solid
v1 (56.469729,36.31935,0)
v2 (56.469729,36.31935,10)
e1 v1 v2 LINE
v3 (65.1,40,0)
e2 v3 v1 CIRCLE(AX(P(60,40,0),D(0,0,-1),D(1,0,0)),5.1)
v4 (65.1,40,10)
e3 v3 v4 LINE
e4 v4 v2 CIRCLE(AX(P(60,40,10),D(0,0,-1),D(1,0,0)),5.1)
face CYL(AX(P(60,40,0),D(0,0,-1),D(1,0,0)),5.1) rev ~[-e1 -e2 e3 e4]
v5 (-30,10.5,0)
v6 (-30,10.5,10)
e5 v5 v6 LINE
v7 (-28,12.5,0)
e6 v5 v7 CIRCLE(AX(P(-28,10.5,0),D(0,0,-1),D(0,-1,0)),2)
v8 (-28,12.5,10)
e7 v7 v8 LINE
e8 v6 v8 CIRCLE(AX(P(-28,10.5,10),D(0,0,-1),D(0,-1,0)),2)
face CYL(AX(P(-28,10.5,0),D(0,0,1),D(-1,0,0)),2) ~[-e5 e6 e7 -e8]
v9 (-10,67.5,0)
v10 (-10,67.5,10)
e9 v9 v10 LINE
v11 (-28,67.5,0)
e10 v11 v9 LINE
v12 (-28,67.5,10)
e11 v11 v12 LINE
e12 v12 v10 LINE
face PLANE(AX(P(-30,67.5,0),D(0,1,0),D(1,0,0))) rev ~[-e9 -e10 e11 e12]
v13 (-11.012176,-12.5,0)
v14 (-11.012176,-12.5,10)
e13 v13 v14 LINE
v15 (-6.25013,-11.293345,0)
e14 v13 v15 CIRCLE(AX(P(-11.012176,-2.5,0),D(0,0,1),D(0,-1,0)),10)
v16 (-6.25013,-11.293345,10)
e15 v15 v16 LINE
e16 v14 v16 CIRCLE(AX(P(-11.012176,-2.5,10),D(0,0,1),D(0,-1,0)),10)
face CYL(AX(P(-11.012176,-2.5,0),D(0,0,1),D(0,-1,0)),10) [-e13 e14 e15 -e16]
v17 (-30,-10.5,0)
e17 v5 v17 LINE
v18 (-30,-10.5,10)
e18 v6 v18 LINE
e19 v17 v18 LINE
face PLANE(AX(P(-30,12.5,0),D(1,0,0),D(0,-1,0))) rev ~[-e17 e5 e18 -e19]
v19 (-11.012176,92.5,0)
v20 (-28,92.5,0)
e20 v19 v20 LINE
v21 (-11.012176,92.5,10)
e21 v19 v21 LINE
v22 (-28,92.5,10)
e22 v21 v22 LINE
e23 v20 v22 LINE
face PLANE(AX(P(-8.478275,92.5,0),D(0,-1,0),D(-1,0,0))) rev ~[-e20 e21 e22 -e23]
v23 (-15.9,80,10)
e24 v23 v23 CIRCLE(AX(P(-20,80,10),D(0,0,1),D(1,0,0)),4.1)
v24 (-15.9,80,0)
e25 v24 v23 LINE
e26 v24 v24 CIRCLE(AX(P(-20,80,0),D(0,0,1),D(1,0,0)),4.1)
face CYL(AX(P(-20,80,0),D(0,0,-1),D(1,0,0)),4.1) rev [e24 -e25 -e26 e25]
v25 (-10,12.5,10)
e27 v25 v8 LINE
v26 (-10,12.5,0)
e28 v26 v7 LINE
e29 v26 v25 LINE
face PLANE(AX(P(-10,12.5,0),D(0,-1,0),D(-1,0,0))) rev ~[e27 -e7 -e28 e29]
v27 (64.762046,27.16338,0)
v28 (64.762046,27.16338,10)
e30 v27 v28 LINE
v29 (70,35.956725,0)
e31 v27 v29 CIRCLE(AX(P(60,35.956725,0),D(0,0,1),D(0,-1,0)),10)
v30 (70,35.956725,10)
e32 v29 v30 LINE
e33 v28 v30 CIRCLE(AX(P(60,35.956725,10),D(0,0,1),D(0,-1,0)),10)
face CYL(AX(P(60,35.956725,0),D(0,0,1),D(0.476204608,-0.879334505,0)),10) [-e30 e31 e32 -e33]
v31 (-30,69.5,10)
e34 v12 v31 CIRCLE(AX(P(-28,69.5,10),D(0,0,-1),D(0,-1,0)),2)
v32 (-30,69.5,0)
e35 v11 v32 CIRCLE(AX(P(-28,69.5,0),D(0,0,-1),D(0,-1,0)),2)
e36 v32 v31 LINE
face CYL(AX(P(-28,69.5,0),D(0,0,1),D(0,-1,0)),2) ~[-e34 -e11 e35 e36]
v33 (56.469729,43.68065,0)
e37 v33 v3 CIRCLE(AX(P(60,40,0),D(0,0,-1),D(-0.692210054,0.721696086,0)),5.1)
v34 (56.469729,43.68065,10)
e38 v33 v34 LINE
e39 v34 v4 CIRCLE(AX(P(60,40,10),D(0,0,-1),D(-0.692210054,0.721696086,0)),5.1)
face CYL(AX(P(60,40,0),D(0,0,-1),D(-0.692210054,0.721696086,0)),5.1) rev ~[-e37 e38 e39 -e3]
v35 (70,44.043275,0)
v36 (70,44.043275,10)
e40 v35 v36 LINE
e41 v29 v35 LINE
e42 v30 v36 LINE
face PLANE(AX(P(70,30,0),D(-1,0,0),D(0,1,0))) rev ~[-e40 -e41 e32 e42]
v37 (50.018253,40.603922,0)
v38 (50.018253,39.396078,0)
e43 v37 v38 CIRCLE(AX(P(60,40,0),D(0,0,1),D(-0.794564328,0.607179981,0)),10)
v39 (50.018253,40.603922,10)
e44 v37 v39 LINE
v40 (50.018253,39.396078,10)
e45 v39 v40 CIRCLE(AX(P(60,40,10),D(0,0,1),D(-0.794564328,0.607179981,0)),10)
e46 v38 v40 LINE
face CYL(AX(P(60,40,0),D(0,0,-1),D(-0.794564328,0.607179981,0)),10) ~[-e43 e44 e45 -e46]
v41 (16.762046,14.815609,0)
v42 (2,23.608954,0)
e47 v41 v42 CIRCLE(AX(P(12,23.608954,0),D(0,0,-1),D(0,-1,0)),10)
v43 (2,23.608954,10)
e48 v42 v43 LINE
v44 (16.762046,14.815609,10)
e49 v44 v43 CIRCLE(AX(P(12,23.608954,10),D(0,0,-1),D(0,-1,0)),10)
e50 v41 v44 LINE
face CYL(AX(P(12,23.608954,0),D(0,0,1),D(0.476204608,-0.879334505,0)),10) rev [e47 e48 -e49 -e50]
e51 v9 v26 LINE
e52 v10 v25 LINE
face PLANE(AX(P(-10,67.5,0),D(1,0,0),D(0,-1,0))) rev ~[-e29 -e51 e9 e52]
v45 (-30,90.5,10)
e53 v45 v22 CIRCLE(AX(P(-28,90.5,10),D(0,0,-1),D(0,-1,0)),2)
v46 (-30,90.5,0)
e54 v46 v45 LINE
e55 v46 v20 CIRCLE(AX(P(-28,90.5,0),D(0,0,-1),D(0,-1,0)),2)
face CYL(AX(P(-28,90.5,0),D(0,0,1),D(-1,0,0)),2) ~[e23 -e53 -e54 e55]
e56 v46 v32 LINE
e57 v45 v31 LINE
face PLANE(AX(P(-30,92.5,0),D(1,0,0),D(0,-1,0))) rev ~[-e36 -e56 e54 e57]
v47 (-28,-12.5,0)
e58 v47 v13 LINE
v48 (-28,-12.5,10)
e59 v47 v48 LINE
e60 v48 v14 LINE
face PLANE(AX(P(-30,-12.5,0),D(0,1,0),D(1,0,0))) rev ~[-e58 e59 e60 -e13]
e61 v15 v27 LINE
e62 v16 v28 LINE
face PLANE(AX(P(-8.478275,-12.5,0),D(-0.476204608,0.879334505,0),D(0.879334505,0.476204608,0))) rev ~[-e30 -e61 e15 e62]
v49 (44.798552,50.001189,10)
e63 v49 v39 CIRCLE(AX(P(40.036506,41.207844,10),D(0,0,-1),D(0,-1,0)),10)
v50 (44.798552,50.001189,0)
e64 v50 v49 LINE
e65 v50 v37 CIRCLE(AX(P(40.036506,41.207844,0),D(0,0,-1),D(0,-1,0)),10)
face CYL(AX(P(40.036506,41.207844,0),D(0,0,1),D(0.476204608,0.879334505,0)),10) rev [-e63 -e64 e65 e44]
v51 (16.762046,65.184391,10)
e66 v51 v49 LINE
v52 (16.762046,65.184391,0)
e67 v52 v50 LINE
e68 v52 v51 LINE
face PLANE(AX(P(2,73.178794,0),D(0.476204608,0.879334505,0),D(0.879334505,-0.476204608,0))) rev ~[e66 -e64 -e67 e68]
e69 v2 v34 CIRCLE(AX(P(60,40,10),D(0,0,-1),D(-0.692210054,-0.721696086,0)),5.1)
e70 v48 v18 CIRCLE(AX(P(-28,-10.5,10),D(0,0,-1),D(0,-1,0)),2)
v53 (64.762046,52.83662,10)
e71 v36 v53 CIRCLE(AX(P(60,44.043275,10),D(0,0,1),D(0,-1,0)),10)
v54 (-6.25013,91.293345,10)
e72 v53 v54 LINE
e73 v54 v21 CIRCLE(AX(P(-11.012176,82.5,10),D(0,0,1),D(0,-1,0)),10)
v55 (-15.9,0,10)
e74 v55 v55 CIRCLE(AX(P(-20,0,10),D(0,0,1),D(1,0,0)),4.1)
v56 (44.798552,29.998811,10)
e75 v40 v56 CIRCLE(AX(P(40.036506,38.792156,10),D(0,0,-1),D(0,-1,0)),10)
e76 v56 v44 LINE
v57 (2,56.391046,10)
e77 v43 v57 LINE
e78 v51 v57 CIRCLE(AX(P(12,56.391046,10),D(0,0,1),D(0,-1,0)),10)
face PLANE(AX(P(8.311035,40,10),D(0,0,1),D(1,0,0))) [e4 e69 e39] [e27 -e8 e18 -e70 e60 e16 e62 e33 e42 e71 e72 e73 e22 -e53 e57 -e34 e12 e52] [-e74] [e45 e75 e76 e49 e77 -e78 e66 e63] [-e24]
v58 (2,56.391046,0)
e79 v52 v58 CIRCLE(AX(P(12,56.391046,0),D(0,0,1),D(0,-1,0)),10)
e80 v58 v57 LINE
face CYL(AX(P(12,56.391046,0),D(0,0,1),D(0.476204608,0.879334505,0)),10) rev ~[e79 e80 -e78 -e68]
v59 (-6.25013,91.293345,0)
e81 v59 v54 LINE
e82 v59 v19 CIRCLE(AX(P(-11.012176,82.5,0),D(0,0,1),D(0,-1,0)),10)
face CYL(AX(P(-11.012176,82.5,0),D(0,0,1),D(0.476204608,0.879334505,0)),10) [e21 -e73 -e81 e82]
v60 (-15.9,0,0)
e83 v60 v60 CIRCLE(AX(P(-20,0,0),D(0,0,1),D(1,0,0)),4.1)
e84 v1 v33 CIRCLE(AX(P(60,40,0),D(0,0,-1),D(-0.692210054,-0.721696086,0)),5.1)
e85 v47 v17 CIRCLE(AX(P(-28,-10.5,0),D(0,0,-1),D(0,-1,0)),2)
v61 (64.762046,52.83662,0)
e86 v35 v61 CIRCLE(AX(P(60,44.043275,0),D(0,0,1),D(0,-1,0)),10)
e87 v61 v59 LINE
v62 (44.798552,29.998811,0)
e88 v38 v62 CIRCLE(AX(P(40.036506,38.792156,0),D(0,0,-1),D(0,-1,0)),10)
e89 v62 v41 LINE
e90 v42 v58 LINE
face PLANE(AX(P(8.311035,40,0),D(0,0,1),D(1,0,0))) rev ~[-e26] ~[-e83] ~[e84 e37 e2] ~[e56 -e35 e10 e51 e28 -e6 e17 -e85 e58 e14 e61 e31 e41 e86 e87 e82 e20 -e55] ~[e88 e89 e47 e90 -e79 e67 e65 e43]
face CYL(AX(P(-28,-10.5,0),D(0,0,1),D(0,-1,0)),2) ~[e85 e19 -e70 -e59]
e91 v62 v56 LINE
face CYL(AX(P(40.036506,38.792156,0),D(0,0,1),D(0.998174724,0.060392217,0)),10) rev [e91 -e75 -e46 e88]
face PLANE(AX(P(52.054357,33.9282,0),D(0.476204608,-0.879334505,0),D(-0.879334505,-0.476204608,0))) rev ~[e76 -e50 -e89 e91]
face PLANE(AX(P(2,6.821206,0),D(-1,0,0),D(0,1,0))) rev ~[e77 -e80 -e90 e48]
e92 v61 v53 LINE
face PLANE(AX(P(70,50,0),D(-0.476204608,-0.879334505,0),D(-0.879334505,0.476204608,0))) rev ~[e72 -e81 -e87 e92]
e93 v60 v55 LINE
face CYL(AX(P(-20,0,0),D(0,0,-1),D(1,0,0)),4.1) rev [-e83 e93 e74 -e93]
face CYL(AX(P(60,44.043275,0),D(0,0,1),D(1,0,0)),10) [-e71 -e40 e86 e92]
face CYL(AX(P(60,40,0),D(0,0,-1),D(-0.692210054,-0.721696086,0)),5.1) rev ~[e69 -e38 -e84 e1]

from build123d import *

# Parameters (mm, degrees)
F0_R     = 4.1
F1_DEPTH = 10
F2_R     = 10
F3_R     = 2


with BuildPart() as f1:
    # F0 (on Top) → F1 (new body)
    with BuildSketch(Plane.XY):
        Polygon((70, 30), (70, 40), (70, 50), (-8.4782754802, 92.5), (-30, 92.5), (-30, 67.5), (-10, 67.5), (-10, 12.5), (-30, 12.5), (-30, -12.5), (-8.4782754802, -12.5), align=None)
        with Locations((-20, 0)):
            Circle(F0_R, mode=Mode.SUBTRACT)
        with Locations((-20, 80)):
            Circle(F0_R, mode=Mode.SUBTRACT)
        with BuildLine():
            Line((2, 73.1787940384), (52.0543567222, 46.0717998075))
            ThreePointArc((52.0543567222, 46.0717998075), (63.2049623416, 49.472497896), (70, 40))
            ThreePointArc((70, 40), (63.2049623416, 30.527502104), (52.0543567222, 33.9282001925))
            Line((52.0543567222, 33.9282001925), (2, 6.8212059616))
            Line((2, 6.8212059616), (2, 73.1787940384))
        make_face(mode=Mode.SUBTRACT)
        with BuildLine():
            ThreePointArc((56.4697287247, 43.6806500408), (62.0007019388, 44.6911823405), (65.1, 40))
            ThreePointArc((65.1, 40), (62.0007019388, 35.3088176595), (56.4697287247, 36.3193499592))
            Line((56.4697287247, 36.3193499592), (52.0543567222, 33.9282001925))
            ThreePointArc((52.0543567222, 33.9282001925), (63.2049623416, 30.527502104), (70, 40))
            ThreePointArc((70, 40), (63.2049623416, 49.472497896), (52.0543567222, 46.0717998075))
            Line((52.0543567222, 46.0717998075), (56.4697287247, 43.6806500408))
        make_face()
        with BuildLine():
            ThreePointArc((56.4697287247, 36.3193499592), (54.9, 40), (56.4697287247, 43.6806500408))
            Line((56.4697287247, 43.6806500408), (52.0543567222, 46.0717998075))
            ThreePointArc((52.0543567222, 46.0717998075), (50, 40), (52.0543567222, 33.9282001925))
            Line((52.0543567222, 33.9282001925), (56.4697287247, 36.3193499592))
        make_face()
    extrude(amount=F1_DEPTH)

    # F2
    f2_edges = [f1.edges().sort_by_distance(p)[0] for p in [
        (-8.478275, 92.5, 5),
        (-8.478275, -12.5, 5),
        (70, 30, 5),
        (70, 50, 5),
        (52.054357, 46.0718, 5),
        (52.054357, 33.9282, 5),
        (2, 6.821206, 5),
        (2, 73.178794, 5),
    ]]
    fillet(f2_edges, radius=F2_R)

    # F3
    f3_edges = [f1.edges().sort_by_distance(p)[0] for p in [
        (-30, 92.5, 5),
        (-30, 67.5, 5),
        (-30, 12.5, 5),
        (-30, -12.5, 5),
    ]]
    fillet(f3_edges, radius=F3_R)


solid = f1.part
